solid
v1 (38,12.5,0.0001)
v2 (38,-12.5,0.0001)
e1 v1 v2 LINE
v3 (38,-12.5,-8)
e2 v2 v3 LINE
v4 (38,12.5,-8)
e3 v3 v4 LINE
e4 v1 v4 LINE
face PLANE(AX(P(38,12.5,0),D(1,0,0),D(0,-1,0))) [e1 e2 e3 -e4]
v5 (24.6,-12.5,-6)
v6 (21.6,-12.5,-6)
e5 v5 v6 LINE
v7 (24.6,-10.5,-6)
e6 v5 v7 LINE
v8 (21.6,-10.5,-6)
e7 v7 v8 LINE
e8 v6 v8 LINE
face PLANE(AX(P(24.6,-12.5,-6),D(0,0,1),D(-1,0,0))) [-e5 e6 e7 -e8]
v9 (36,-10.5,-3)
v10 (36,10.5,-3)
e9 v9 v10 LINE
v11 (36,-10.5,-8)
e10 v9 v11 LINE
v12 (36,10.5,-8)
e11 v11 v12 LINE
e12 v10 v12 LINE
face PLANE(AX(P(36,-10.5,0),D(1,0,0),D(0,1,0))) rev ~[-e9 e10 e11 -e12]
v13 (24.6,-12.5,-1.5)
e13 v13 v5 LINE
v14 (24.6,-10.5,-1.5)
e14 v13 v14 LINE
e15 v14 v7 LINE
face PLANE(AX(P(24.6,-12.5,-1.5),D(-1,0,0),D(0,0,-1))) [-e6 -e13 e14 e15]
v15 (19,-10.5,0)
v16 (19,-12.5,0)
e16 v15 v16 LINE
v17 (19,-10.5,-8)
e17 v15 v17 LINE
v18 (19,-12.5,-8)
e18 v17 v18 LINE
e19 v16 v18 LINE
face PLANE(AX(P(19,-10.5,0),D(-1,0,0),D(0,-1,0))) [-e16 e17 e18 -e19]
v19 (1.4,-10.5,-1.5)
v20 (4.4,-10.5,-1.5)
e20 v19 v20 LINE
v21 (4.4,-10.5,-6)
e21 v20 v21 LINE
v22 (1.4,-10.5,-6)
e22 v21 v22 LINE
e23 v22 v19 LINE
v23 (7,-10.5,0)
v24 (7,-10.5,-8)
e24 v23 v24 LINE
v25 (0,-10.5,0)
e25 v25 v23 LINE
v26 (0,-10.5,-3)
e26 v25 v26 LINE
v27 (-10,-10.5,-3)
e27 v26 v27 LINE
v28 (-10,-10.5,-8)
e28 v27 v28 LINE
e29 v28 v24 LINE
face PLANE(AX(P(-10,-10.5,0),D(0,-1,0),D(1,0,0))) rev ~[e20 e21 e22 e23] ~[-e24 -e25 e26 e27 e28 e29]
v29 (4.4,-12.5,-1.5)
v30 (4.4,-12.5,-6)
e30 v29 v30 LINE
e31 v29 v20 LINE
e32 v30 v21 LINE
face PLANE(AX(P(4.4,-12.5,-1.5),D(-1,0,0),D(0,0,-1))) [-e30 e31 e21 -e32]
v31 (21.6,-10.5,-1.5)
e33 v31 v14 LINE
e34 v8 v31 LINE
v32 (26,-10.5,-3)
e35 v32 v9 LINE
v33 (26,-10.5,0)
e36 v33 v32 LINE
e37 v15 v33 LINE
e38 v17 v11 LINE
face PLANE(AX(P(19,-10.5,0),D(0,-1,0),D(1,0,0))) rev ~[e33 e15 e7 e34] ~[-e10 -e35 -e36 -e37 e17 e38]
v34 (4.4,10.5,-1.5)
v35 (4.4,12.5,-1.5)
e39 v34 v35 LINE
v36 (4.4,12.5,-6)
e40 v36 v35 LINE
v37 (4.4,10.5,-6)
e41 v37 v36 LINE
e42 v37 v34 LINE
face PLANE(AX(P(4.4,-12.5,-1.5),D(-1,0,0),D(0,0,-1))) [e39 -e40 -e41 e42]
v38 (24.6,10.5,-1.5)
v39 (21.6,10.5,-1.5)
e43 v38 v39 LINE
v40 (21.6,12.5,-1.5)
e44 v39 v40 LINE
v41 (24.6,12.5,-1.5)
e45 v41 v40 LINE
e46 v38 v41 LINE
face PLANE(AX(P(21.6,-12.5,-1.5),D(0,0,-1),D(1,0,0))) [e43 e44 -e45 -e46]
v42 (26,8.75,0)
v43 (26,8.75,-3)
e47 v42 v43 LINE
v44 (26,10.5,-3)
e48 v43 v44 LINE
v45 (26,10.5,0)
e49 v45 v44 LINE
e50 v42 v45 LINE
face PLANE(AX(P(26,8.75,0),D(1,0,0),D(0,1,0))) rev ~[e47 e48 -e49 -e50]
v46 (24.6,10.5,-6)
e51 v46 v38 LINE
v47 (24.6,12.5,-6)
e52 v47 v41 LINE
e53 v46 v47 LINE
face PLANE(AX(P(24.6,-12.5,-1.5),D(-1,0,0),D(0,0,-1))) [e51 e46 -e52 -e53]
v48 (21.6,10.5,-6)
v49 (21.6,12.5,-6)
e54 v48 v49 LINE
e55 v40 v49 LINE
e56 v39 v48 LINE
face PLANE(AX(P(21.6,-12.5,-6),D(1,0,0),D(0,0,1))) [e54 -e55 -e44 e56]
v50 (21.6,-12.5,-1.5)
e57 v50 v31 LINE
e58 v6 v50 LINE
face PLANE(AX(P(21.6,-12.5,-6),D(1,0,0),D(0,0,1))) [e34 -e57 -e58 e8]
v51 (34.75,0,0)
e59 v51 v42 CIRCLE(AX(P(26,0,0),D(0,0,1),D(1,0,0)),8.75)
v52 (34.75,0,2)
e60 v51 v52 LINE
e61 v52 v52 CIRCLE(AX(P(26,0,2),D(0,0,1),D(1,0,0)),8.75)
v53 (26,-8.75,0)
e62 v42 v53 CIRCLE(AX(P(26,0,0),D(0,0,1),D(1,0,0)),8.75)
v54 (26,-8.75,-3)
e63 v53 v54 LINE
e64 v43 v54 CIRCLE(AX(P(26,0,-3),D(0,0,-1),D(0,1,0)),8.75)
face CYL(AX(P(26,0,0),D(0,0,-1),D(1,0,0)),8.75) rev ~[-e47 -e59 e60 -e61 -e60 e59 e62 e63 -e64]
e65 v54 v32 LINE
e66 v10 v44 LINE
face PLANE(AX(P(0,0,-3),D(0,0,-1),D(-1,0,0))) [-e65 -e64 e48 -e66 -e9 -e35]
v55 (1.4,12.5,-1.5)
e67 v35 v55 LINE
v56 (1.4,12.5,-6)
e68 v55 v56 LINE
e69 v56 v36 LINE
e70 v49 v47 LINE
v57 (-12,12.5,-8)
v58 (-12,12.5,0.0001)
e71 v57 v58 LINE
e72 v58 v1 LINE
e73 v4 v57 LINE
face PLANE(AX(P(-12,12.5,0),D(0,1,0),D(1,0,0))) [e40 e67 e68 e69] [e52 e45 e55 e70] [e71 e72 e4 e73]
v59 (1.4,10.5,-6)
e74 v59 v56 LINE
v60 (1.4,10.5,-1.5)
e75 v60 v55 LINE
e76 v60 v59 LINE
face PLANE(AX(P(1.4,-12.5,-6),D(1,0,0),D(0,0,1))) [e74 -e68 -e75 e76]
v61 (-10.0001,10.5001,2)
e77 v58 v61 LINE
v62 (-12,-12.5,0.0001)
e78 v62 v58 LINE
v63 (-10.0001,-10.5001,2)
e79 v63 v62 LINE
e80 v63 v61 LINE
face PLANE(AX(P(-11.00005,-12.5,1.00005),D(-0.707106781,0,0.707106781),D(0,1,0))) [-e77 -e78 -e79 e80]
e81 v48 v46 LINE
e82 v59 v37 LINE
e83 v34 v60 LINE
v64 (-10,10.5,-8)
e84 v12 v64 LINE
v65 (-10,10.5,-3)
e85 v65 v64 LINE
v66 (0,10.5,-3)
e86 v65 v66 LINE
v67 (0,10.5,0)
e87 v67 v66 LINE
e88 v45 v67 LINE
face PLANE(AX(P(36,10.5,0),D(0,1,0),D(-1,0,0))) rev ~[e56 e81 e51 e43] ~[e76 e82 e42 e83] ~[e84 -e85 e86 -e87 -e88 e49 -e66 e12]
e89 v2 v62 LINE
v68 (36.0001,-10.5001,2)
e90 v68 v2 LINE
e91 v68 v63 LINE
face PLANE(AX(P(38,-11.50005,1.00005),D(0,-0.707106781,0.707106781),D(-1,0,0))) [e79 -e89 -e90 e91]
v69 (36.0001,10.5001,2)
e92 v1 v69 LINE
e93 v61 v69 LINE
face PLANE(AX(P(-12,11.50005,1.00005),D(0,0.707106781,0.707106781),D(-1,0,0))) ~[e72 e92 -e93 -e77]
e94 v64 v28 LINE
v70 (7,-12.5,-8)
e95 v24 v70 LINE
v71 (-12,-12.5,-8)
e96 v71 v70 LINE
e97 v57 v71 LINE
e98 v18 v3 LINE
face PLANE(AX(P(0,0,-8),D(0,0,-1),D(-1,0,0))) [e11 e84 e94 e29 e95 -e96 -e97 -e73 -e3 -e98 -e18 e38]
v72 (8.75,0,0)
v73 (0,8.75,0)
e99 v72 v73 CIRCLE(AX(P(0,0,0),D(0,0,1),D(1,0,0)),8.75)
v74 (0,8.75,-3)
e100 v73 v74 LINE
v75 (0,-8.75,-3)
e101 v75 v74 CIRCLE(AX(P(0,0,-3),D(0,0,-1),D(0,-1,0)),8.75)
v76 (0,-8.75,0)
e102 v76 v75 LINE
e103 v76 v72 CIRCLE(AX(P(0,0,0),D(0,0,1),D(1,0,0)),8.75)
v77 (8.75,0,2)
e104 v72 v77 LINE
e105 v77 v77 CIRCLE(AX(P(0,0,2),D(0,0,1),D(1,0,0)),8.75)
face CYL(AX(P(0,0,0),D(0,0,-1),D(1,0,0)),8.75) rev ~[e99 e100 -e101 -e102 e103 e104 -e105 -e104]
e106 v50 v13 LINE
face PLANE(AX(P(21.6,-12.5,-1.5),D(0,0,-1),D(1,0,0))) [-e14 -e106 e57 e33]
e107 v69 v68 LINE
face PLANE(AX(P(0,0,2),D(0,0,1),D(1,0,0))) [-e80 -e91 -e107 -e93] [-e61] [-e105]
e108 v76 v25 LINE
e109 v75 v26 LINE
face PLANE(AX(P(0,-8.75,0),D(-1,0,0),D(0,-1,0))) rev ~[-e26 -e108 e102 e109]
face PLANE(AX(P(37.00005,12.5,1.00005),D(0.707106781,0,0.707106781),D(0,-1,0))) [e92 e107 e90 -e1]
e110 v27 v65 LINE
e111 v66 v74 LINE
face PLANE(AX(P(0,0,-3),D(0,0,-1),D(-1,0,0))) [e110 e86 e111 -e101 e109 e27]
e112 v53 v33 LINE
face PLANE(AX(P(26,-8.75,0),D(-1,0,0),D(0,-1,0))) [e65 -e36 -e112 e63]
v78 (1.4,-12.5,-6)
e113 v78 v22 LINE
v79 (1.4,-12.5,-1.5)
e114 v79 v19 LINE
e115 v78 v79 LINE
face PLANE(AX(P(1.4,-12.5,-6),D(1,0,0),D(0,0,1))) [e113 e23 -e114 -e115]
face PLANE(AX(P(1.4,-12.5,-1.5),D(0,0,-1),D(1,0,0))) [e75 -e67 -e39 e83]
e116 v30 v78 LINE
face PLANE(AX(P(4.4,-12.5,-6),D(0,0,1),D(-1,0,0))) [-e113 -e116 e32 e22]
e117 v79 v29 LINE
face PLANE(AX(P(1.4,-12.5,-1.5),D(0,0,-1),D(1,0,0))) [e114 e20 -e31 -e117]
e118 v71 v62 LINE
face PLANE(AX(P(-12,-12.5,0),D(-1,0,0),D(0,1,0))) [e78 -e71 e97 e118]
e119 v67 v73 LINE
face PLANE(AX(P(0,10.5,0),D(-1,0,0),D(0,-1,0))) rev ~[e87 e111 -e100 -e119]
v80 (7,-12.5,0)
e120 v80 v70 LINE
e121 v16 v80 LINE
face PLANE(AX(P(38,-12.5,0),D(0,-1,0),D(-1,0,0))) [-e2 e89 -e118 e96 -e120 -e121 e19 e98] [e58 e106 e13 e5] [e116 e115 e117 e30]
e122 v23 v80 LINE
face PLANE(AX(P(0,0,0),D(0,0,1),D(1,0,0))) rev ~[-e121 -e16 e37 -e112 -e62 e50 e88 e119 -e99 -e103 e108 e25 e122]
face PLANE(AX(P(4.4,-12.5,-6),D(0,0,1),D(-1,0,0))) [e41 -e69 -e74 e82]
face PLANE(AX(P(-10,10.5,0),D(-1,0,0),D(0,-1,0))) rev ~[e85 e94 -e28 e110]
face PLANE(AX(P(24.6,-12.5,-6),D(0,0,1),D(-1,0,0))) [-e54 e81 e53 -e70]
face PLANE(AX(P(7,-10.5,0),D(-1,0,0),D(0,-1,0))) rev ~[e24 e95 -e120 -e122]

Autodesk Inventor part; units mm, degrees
ref_plane "YZ Plane" through (0, 0, 0) normal (1, 0, 0) x (0, 1, 0)
ref_plane "XZ Plane" through (0, 0, 0) normal (0, 1, 0) x (-1, 0, 0)
ref_plane "XY Plane" through (0, 0, 0) normal (0, 0, 1) x (1, 0, 0)
sketch "Sketch1" plane through (0, 0, 0) normal (0, 0, 1) x (1, 0, 0)
  circle A0 centre (0, 0) radius 8.75
  circle A1 centre (26, 0) radius 8.75
  line L0 (-12, 12.5) -> (38, 12.5)
  line L1 (38, 12.5) -> (38, -12.5)
  line L2 (38, -12.5) -> (-12, -12.5)
  line L3 (-12, -12.5) -> (-12, 12.5)
  dimension "d0" = 17.5
  dimension "d1" = 17.5
  dimension "d2" = 26
  dimension "d3" = 50
  dimension "d4" = 25
  dimension "d5" = 12
  dimension "d6" = 12.5
extrude "Extrusion1" add sketch "Sketch1" along normal blind 2
sketch "Sketch2" plane through (0, 0, 0) normal (0, 0, -1) x (-1, 0, 0)
  line L0 (-38, 12.5) -> (12, 12.5) projected
  line L1 (12, -12.5) -> (-38, -12.5) projected
  line L2 (-38, 12.5) -> (12, 12.5)
  line L3 (12, 12.5) -> (12, -12.5)
  line L4 (-38, -12.5) -> (-38, 12.5)
  line L5 (-36, 10.5) -> (10, 10.5)
  line L6 (10, 10.5) -> (10, -10.5)
  line L7 (-36, -10.5) -> (-36, 10.5)
  line L8 (-19, -10.5) -> (-19, -12.5)
  line L9 (-7, -10.5) -> (-7, -12.5)
  line L10 (10, -10.5) -> (-7, -10.5)
  line L11 (-19, -10.5) -> (-36, -10.5)
  line L12 (12, -12.5) -> (-7, -12.5)
  line L13 (-19, -12.5) -> (-38, -12.5)
  point P0 (0, 0)
  point P1 (12, 12.5)
  point P2 (-19, -12.5)
  point P3 (-7, -12.5)
  dimension "d12" = 2
  dimension "d14" = 46
  dimension "d16" = 21
  dimension "d19" = 12
  dimension "d20" = 19
  dimension "d21" = 2
  dimension "d22" = 2
  dimension "d23" = 25
extrude "Extrusion2" add sketch "Sketch2" along normal blind 8 contours L0 L3 L1 L9 L10 L6 L5 L7 L11 L8 L4
sketch "Sketch3" plane through (0, 0, 0) normal (0, 0, -1) x (-1, 0, 0)
  circle A0 centre (-26, 0) radius 8.75 projected
  arc A1 (-26, 8.75) -> (-34.75, 0) centre (-26, 0) ccw
  line L0 (-36, 10.5) -> (-36, -10.5) projected
  line L1 (-36, 10.5) -> (-26, 10.5)
  line L2 (10, 10.5) -> (-36, 10.5) projected
  line L3 (-26, 8.75) -> (-26, 10.5)
  arc A2 (-34.75, 0) -> (-26, -8.75) centre (-26, 0) ccw
  line L4 (-26, -8.75) -> (-26, -10.5)
  line L5 (-19, -10.5) -> (-36, -10.5) projected
  line L6 (-36, -10.5) -> (-26, -10.5)
  line L7 (-36, 0) -> (-36, -10.5)
  circle A3 centre (0, 0) radius 8.75 projected
  arc A4 (8.75, 0) -> (0, 8.75) centre (0, 0) ccw
  arc A5 (0, -8.75) -> (8.75, 0) centre (0, 0) ccw
  line L8 (0, -8.75) -> (0, -10.5)
  line L9 (0, -10.5) -> (10, -10.5)
  line L10 (10, -10.5) -> (10, 10.5)
  line L11 (0, 10.5) -> (0, 8.75)
  point P0 (-26, 9.625)
  point P1 (-35.375, 0)
  point P2 (-26, -9.625)
  point P3 (0, 9.625)
extrude "Extrusion3" add sketch "Sketch3" along normal blind 3 contours A0 L4 L5 L0 L1 L3 | L10 L9 L8 A3 L11 L2
chamfer "Chamfer2" distance 2 angle 45 4 edges at (13, 12.5, 2) (13, -12.5, 2) (38, 0, 2) (-12, 0, 2)
sketch "Sketch5" plane through (19, -12.5, -8) normal (0, -1, 0) x (1, 0, 0)
  line L0 (5.6, 2) -> (2.6, 2)
  line L1 (2.6, 2) -> (2.6, 6.5)
  line L2 (2.6, 6.5) -> (5.6, 6.5)
  line L3 (5.6, 6.5) -> (5.6, 2)
  line L4 (-14.6, 2) -> (-17.6, 2)
  line L5 (-17.6, 2) -> (-17.6, 6.5)
  line L6 (-17.6, 6.5) -> (-14.6, 6.5)
  line L7 (-14.6, 6.5) -> (-14.6, 2)
  line L8 (19, 0) -> (19, 10) projected
  line L9 (0, 8) -> (19, 8) projected
  line L10 (19, 0) -> (0, 0) projected
  line L11 (-31, 8) -> (-12, 8) projected
  point P0 (-19, 8)
  dimension "d29" = 3
  dimension "d31" = 3
  dimension "d33" = 17.2
  dimension "d34" = 13.4
  dimension "d35" = 1.5
  dimension "d38" = 2
  dimension "d39" = 1.5
extrude "Extrusion4" cut sketch "Sketch5" against normal through all
properties part number "UltrasonicSensorMountTest"
